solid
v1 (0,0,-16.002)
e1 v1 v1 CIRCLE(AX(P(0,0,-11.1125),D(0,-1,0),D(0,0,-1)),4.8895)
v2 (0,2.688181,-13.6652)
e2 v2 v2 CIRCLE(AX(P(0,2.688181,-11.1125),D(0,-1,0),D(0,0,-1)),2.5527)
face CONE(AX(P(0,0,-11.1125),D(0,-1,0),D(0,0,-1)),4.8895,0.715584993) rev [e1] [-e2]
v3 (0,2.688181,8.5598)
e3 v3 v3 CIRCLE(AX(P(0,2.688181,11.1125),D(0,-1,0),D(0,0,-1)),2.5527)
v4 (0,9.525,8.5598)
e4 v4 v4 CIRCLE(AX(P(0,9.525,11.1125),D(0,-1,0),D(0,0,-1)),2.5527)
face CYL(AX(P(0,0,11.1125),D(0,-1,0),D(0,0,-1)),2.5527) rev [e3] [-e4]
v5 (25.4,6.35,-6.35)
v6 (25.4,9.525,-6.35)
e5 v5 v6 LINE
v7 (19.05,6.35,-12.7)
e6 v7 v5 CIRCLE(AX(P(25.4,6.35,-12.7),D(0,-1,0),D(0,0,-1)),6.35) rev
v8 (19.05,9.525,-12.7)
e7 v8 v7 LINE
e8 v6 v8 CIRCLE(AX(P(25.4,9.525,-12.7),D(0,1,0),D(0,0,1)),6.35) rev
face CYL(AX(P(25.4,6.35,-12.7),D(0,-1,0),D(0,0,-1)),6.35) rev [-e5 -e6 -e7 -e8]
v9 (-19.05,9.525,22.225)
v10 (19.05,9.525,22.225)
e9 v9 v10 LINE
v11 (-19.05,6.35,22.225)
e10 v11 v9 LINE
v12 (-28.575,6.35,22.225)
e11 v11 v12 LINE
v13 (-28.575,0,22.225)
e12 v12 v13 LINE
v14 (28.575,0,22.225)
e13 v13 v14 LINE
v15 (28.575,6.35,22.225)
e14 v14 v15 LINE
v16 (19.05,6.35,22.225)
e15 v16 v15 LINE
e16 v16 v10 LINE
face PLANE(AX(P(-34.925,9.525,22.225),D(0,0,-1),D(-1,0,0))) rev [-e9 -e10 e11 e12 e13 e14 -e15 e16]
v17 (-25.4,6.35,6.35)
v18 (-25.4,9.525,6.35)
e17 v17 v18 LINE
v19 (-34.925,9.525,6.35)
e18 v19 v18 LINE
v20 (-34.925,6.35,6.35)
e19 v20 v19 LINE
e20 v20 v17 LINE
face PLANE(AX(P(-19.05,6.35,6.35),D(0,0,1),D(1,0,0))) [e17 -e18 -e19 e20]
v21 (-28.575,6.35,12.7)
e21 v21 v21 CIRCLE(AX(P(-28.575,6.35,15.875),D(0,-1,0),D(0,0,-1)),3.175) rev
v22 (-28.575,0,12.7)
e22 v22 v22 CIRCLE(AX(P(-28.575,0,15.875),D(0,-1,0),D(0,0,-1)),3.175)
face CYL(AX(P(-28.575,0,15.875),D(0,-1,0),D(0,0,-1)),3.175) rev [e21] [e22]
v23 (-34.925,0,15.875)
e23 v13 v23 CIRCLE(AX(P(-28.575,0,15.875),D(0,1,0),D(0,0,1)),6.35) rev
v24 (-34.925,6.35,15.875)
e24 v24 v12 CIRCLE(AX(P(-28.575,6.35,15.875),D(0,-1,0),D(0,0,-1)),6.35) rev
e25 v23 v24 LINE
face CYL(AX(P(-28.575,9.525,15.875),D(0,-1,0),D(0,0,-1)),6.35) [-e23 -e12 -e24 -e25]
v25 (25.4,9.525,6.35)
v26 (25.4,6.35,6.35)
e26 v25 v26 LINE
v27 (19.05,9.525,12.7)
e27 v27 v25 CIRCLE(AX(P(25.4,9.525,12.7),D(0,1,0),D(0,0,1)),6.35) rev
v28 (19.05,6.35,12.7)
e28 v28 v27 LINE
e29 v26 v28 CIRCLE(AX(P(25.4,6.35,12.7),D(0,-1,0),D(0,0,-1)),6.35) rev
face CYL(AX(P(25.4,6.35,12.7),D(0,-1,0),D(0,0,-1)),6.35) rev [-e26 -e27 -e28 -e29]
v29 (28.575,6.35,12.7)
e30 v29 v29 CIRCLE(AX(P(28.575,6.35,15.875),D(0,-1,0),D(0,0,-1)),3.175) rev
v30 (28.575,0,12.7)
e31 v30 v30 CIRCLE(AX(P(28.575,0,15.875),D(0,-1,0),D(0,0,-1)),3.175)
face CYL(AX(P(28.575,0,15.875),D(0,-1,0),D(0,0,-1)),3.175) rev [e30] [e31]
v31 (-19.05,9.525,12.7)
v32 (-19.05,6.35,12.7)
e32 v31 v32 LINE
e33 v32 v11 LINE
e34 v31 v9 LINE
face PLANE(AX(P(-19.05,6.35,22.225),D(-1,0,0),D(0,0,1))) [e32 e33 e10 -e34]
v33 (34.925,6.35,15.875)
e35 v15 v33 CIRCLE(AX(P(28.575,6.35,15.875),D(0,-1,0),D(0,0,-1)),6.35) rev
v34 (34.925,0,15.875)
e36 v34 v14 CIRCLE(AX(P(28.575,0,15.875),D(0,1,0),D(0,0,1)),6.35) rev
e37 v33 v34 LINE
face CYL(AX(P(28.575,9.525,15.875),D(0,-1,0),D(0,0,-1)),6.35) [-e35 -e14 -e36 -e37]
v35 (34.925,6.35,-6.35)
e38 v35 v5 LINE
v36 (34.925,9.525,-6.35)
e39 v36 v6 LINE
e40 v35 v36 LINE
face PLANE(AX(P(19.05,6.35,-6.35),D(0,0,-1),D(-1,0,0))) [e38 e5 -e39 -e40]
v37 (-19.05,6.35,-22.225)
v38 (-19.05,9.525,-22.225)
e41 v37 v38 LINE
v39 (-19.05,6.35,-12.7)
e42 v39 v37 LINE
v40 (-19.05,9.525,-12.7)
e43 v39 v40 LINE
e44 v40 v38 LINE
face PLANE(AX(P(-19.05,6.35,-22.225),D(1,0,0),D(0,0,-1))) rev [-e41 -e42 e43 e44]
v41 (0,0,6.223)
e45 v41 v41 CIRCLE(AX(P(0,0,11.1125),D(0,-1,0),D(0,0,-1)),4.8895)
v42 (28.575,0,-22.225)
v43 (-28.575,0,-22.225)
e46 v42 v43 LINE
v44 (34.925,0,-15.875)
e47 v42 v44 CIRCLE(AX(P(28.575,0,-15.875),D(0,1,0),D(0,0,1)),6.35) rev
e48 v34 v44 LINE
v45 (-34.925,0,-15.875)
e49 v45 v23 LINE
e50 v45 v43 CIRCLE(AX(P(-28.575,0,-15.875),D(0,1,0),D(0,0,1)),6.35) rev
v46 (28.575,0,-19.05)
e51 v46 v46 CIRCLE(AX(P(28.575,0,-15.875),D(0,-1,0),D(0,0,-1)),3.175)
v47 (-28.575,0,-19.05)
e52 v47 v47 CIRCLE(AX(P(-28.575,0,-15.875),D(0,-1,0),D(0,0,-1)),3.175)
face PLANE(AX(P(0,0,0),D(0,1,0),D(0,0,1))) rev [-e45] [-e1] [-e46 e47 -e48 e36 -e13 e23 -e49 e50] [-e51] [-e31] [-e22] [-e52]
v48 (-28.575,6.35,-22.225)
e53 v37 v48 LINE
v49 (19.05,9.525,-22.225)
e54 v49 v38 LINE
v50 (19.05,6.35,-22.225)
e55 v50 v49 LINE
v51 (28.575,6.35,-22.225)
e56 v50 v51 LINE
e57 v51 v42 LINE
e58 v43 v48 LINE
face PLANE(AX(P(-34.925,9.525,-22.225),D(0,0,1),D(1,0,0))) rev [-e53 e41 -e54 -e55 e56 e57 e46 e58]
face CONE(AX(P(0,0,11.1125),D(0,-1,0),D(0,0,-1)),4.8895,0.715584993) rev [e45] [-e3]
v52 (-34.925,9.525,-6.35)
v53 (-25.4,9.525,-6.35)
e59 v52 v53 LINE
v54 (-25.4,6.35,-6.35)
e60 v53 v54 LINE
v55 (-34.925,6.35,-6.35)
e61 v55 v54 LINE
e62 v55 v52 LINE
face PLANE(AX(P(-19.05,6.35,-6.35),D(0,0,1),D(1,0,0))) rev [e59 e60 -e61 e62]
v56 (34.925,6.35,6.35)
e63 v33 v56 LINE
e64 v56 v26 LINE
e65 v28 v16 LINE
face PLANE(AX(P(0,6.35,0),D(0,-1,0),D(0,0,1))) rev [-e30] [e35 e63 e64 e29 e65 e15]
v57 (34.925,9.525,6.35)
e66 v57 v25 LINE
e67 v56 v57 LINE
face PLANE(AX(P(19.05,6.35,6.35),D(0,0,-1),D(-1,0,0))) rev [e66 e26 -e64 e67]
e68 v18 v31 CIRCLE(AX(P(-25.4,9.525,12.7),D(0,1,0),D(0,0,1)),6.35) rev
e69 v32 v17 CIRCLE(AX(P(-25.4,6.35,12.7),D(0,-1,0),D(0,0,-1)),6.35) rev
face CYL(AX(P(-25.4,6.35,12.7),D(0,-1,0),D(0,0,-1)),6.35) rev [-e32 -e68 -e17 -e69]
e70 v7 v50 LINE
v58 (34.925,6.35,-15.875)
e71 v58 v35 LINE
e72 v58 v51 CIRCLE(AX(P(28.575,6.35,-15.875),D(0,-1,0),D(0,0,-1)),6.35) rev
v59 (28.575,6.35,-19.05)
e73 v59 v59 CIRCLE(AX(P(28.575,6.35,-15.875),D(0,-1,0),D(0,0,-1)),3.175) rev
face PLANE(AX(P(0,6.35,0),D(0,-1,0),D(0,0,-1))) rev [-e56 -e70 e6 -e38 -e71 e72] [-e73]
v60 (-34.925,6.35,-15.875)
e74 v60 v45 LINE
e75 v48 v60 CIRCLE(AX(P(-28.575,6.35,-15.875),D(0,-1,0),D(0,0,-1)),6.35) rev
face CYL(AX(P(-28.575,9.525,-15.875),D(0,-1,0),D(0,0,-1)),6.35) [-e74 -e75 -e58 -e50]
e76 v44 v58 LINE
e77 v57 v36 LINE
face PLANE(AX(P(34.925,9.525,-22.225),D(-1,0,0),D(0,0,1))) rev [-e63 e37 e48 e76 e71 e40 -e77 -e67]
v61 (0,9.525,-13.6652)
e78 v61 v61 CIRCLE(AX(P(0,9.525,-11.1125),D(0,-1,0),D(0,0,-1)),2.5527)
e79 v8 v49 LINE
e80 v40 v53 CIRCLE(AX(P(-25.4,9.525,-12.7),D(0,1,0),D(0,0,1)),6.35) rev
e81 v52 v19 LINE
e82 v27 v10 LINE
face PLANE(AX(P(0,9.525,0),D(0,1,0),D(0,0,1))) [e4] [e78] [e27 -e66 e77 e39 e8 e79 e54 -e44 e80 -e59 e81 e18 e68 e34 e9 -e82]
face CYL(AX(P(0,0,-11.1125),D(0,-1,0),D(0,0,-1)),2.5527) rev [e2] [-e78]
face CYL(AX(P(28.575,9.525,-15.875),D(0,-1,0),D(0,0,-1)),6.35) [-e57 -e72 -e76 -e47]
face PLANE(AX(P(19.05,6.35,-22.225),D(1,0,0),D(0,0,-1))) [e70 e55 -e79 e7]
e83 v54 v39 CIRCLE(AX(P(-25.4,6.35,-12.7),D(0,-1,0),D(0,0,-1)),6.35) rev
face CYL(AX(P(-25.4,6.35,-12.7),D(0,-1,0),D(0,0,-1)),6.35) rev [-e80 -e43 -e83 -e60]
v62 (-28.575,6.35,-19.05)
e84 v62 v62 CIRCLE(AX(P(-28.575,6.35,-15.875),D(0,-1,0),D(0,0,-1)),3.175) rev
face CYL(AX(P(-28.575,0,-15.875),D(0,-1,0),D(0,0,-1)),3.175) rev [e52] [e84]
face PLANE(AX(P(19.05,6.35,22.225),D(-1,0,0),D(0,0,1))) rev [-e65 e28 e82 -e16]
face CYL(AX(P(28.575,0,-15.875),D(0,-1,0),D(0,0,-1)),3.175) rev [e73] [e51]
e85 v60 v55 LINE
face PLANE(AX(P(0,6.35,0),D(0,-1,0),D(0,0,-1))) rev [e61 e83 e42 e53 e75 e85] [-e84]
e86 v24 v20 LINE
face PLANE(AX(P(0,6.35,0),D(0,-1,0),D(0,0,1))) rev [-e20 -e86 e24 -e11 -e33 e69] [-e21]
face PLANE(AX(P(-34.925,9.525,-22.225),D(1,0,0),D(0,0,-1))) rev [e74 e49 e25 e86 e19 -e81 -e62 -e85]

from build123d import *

# Parameters (mm, degrees)
SKETCH1_W                                          = 69.85
SKETCH1_H                                          = 44.45
BOSS_EXTRUDE1_DEPTH                                = 9.525
CSK_FOR_10_FLAT_HEAD_MACHINE_SCREW_100_D           = 5.1054
CSK_FOR_10_FLAT_HEAD_MACHINE_SCREW_100_CSINK_D     = 9.779
CSK_FOR_10_FLAT_HEAD_MACHINE_SCREW_100_CSINK_ANGLE = 82
FILLET4_R                                          = 6.35
F_1_4_0_25_DIAMETER_HOLE1_D                        = 6.35
SKETCH10_W                                         = 15.875
SKETCH10_H                                         = 15.875
CUT_EXTRUDE2_DEPTH                                 = 3.175
FILLET5_R                                          = 6.35
FILLET5_OF_MIRROR2_R                               = 6.35
MIRROR3_START                                      = 6.35
MIRROR3_OUTLINE_R                                  = 3.175
MIRROR3_DEPTH                                      = 3.175


# Read off the part's stored shape, not the designer's step: Mirror3
with BuildPart() as part:
    # Sketch1 → Boss-Extrude1 (new body)
    with BuildSketch(Plane(origin=(0, 0, 0), x_dir=(1, 0, 0), z_dir=(0, 1, 0))):
        Rectangle(SKETCH1_W, SKETCH1_H)
    extrude(amount=BOSS_EXTRUDE1_DEPTH)

    # CSK for #10 Flat Head Machine Screw (100)1 (through all)
    with Locations(Plane(origin=(0, 0, 0), x_dir=(-1, 0, 0), z_dir=(0, -1, 0))):
        with Locations((0, 11.1125), (0, -11.1125)):
            CounterSinkHole(CSK_FOR_10_FLAT_HEAD_MACHINE_SCREW_100_D / 2, CSK_FOR_10_FLAT_HEAD_MACHINE_SCREW_100_CSINK_D / 2, counter_sink_angle=CSK_FOR_10_FLAT_HEAD_MACHINE_SCREW_100_CSINK_ANGLE)

    # Fillet4
    fillet4_edges = [part.edges().sort_by_distance(p)[0] for p in [
        (34.925, 4.7625, 22.225),
        (-34.925, 4.7625, 22.225),
        (-34.925, 4.7625, -22.225),
        (34.925, 4.7625, -22.225),
    ]]
    fillet(fillet4_edges, radius=FILLET4_R)

    # 1/4 (0.25) Diameter Hole1 (through all)
    with Locations(Plane(origin=(0, 0, 0), x_dir=(-1, 0, 0), z_dir=(0, -1, 0))):
        with Locations((-28.575, 15.875), (-28.575, -15.875)):
            f_1_4_0_25_diameter_hole1 = Hole(F_1_4_0_25_DIAMETER_HOLE1_D / 2)

    # Mirror1: 1/4 (0.25) Diameter Hole1 across plane
    add(f_1_4_0_25_diameter_hole1.mirror(Plane(origin=(0, 0, 0), x_dir=(0, 0, 1), z_dir=(1, 0, 0))), mode=Mode.SUBTRACT)

    # Sketch10 → Cut-Extrude2 (cut)
    with BuildSketch(Plane(origin=(0, 9.525, 0), x_dir=(1, 0, 0), z_dir=(0, 1, 0))):
        with Locations((-26.9875, 14.2875)):
            Rectangle(SKETCH10_W, SKETCH10_H)
    cut_extrude2 = extrude(amount=-CUT_EXTRUDE2_DEPTH, mode=Mode.SUBTRACT)

    # Fillet5
    fillet5_edges = [part.edges().sort_by_distance(p)[0] for p in [
        (-19.05, 7.9375, -6.35),
    ]]
    fillet(fillet5_edges, radius=FILLET5_R)

    # Mirror2: Cut-Extrude2 across plane
    add(cut_extrude2.mirror(Plane.XY), mode=Mode.SUBTRACT)

    # Fillet5 of Mirror2
    fillet5_of_mirror2_edges = [part.edges().sort_by_distance(p)[0] for p in [
        (-19.05, 7.9375, 6.35),
    ]]
    fillet(fillet5_of_mirror2_edges, radius=FILLET5_OF_MIRROR2_R)

    # Mirror3 outline → Mirror3 (cut)
    # profile 1 of 2: a face of its own
    with BuildSketch(Plane(origin=(0, 0, 0), x_dir=(1, 0, 0), z_dir=(0, 1, 0)).offset(MIRROR3_START)):
        with BuildLine():
            Line((25.4, 6.35), (34.925, 6.35))
            Line((34.925, 6.35), (34.925, 15.875))
            ThreePointArc((34.925, 15.875), (33.065128061, 20.365128061), (28.575, 22.225))
            Line((28.575, 22.225), (19.05, 22.225))
            Line((19.05, 22.225), (19.05, 12.7))
            ThreePointArc((19.05, 12.7), (20.909871939, 8.209871939), (25.4, 6.35))
        make_face()
        with Locations((28.575, 15.875)):
            Circle(MIRROR3_OUTLINE_R, mode=Mode.SUBTRACT)
    # profile 2 of 2: a face of its own
    with BuildSketch(Plane(origin=(0, 0, 0), x_dir=(1, 0, 0), z_dir=(0, 1, 0)).offset(MIRROR3_START)):
        with BuildLine():
            Line((34.925, -15.875), (34.925, -6.35))
            Line((34.925, -6.35), (25.4, -6.35))
            ThreePointArc((25.4, -6.35), (20.909871939, -8.209871939), (19.05, -12.7))
            Line((19.05, -12.7), (19.05, -22.225))
            Line((19.05, -22.225), (28.575, -22.225))
            ThreePointArc((28.575, -22.225), (33.065128061, -20.365128061), (34.925, -15.875))
        make_face()
        with Locations((28.575, -15.875)):
            Circle(MIRROR3_OUTLINE_R, mode=Mode.SUBTRACT)
    extrude(amount=MIRROR3_DEPTH, mode=Mode.SUBTRACT)


solid = part.part
